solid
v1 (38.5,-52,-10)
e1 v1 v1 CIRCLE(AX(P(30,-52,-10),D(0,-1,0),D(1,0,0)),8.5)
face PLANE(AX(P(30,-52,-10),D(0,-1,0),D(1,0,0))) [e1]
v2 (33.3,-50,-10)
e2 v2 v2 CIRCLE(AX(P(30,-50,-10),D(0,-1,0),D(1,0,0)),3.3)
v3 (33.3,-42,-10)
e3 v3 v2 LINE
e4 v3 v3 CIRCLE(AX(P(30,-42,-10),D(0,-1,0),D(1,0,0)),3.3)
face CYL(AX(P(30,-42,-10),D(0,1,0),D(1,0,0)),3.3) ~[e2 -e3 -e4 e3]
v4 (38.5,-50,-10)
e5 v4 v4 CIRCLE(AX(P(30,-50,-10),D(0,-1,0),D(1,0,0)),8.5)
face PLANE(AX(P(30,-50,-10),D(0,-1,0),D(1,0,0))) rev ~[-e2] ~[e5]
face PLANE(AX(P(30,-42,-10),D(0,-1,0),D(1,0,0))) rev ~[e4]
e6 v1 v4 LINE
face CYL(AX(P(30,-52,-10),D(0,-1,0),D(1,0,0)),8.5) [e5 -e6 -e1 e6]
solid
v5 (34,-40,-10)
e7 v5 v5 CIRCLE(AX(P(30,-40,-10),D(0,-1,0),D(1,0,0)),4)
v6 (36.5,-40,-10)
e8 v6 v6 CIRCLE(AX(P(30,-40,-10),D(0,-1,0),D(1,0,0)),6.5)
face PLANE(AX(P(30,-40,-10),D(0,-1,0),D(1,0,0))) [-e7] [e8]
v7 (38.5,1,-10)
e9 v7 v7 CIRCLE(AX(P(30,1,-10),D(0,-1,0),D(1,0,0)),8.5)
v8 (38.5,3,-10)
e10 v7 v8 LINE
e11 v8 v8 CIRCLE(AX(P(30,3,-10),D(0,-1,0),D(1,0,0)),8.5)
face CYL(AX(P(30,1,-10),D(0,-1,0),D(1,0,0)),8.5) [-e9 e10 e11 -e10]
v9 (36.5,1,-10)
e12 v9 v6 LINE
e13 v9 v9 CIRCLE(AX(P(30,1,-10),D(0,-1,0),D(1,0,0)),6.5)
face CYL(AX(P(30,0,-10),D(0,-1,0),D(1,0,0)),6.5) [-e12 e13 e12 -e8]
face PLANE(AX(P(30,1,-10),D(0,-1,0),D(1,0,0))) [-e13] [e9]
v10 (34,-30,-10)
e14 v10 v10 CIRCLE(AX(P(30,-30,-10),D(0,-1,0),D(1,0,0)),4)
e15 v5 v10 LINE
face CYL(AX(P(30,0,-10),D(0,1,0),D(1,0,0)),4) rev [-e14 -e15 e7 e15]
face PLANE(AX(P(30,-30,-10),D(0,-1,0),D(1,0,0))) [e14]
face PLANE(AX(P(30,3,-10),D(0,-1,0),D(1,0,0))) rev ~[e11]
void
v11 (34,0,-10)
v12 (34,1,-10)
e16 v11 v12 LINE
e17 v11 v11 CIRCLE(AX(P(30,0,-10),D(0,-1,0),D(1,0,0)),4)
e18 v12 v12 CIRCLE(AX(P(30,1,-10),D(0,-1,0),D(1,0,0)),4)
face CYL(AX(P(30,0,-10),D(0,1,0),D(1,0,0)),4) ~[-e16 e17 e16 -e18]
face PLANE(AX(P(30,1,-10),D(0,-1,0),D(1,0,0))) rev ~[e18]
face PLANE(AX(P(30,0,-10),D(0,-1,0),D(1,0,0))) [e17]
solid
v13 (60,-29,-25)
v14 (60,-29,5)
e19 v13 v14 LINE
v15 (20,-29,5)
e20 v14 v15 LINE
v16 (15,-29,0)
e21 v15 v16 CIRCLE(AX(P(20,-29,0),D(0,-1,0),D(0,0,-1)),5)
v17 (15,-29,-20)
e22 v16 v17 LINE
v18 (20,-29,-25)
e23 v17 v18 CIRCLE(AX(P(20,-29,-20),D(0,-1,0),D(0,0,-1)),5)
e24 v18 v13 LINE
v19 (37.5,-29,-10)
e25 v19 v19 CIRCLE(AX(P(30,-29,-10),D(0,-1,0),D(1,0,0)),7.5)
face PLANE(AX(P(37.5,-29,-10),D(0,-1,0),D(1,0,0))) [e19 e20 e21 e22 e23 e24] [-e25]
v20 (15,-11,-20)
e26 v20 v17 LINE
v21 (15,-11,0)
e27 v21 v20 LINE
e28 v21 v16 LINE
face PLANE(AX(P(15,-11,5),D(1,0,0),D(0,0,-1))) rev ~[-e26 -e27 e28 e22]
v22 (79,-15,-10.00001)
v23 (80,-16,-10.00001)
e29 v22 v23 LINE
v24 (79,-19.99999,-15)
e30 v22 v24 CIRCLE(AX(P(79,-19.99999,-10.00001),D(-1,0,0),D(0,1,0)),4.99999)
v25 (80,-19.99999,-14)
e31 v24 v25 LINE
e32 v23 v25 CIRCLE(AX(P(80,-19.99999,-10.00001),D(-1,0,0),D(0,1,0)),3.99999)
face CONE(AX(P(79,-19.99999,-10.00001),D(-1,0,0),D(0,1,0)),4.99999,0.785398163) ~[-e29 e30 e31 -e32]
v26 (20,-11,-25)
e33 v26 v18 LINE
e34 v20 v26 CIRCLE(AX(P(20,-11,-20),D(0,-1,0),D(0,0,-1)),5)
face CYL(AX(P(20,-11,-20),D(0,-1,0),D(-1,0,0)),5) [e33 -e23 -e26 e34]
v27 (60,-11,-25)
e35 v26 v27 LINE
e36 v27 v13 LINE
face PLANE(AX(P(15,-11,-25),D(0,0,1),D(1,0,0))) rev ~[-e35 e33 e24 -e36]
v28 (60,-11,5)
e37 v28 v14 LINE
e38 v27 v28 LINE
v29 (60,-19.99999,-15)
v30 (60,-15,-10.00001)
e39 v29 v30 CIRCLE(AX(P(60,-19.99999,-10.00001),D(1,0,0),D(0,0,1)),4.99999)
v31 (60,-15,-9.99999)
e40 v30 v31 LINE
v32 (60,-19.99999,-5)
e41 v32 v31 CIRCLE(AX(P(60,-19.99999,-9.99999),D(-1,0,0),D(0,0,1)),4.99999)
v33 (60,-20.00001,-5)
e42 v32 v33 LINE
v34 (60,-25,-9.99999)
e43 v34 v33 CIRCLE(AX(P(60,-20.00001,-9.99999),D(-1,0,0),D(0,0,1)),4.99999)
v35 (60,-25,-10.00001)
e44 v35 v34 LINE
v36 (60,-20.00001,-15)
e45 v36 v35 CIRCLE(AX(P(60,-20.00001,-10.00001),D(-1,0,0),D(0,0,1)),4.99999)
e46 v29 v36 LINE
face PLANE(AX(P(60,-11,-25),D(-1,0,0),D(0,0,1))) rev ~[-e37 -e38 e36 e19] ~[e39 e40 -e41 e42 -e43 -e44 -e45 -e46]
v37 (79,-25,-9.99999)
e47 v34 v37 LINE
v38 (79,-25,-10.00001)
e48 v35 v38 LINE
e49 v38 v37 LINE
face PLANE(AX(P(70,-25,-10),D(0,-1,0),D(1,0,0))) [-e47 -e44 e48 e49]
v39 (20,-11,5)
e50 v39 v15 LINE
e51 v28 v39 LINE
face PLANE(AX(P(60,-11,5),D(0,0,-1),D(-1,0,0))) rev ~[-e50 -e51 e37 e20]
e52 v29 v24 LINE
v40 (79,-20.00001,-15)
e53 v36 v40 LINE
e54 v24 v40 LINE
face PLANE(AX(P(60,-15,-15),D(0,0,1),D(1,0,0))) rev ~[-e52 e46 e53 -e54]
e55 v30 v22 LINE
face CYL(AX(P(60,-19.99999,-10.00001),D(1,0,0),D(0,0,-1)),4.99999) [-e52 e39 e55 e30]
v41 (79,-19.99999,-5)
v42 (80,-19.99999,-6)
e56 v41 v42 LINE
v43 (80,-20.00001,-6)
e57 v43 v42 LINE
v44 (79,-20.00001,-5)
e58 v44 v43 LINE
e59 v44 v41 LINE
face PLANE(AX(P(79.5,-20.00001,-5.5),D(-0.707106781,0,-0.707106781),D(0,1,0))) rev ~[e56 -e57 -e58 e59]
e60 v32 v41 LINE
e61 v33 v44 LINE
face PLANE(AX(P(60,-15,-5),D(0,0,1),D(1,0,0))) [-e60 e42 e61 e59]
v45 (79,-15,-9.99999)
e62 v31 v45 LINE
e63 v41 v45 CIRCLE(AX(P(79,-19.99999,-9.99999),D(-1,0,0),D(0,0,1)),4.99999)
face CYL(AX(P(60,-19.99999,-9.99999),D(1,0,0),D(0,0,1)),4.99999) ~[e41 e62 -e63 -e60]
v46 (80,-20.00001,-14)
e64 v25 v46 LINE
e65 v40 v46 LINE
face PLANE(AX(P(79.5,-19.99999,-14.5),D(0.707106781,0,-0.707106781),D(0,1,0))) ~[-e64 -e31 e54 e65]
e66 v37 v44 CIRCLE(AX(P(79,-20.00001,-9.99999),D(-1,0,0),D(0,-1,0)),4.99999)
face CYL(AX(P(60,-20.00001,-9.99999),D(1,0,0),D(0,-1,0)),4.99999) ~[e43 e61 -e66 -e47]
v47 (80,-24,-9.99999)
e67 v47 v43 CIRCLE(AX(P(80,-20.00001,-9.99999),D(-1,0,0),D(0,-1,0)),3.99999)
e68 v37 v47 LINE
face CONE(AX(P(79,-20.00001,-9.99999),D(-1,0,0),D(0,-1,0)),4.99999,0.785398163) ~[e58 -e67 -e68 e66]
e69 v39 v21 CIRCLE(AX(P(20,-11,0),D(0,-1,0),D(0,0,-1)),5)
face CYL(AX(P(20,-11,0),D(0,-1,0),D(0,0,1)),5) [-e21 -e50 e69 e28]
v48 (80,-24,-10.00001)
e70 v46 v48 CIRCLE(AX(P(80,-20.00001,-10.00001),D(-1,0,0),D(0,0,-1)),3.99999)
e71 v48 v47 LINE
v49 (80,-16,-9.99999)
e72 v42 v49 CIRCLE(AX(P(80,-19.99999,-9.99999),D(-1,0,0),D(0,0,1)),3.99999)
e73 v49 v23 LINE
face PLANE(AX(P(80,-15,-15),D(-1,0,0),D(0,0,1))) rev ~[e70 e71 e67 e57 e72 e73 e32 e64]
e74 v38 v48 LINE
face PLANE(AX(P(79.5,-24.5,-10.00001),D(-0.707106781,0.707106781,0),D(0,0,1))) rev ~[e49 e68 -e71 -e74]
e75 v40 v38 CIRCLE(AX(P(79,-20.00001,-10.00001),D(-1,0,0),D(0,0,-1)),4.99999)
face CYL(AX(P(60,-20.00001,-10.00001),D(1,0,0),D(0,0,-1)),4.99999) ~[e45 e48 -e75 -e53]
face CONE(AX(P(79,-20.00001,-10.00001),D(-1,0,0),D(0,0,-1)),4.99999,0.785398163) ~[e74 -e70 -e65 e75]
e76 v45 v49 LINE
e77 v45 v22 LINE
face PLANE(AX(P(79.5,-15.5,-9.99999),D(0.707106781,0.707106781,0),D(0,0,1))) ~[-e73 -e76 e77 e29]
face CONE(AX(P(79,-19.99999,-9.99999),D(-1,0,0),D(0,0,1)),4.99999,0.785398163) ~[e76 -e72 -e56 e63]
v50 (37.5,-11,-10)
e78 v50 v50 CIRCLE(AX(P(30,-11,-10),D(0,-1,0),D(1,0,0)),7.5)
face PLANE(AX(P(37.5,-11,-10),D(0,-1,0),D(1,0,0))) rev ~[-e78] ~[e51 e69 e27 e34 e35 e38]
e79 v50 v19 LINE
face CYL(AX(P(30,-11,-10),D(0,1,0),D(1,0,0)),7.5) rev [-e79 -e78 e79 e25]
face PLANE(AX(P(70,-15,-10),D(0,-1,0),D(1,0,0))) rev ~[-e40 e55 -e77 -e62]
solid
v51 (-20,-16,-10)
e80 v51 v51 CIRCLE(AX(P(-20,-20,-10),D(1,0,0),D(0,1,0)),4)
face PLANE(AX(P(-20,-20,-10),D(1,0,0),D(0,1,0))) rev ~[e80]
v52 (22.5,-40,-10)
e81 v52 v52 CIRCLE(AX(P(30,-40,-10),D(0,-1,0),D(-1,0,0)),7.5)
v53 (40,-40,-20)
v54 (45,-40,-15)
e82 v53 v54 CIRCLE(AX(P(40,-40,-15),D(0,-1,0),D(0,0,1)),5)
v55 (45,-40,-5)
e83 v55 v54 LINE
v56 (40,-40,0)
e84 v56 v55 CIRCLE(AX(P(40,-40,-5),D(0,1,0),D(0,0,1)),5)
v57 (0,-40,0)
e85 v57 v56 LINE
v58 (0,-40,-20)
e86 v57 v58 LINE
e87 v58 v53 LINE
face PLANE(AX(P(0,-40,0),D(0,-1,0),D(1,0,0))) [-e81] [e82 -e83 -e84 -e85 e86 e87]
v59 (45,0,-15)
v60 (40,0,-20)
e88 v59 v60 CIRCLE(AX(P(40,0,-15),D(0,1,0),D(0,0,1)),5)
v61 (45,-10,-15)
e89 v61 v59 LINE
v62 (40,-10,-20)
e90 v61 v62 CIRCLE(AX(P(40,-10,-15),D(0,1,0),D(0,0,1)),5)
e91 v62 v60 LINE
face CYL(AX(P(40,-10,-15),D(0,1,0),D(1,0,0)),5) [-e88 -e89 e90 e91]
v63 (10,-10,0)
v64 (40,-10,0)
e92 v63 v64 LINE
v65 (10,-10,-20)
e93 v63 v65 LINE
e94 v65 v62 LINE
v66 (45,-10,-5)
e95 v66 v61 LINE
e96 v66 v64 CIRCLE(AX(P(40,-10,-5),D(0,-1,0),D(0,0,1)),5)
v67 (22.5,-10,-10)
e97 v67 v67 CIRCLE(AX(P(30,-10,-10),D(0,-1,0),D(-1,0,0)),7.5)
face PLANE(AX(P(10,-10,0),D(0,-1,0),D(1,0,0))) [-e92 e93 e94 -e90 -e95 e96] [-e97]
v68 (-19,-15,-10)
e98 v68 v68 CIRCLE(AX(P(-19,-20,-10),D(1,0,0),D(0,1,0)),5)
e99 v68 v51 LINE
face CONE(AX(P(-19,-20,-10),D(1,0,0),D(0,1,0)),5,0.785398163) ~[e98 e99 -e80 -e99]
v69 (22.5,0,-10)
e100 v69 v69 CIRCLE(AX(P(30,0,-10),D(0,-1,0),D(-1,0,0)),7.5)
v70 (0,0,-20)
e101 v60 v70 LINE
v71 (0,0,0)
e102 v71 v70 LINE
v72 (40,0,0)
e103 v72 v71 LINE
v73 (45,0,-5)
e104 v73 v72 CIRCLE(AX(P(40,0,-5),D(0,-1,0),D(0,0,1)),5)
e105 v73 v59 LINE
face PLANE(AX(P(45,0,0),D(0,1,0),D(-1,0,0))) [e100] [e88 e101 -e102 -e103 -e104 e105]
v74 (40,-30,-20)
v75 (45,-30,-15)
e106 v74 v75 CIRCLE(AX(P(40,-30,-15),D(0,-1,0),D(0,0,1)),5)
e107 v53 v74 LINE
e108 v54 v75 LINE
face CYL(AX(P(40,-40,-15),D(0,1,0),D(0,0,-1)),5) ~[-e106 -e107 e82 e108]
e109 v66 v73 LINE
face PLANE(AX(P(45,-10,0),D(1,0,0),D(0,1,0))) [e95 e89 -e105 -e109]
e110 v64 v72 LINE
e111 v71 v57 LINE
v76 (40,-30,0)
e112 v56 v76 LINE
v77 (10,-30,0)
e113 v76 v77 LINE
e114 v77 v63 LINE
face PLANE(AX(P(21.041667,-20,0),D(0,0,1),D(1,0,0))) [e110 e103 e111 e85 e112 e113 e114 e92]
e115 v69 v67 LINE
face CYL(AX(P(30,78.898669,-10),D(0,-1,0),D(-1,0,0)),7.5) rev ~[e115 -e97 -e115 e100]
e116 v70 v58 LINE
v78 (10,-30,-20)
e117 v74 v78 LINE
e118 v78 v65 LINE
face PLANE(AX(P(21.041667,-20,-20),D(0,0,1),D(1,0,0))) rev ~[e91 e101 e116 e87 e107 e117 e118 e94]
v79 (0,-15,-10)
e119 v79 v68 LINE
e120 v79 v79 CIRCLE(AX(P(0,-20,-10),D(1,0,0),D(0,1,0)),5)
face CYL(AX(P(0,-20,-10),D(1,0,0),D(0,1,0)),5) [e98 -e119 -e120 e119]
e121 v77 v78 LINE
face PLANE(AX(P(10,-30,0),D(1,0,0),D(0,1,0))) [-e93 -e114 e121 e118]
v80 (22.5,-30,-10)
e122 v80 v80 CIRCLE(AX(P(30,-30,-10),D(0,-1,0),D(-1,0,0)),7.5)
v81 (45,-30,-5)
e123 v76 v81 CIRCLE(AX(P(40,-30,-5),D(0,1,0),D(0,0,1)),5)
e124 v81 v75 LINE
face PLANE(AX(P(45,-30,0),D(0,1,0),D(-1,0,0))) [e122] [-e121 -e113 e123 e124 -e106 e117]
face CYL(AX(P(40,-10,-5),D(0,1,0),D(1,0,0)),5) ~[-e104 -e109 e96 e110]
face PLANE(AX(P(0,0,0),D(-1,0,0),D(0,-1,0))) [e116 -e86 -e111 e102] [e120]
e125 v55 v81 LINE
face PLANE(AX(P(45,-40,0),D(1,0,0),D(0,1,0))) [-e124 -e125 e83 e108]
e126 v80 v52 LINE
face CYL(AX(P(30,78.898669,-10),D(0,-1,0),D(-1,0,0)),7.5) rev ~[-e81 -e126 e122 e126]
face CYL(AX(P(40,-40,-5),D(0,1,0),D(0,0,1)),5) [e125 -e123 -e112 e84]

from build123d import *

# Parameters (mm, degrees)
F0_R          = 5
F1_DEPTH      = 20
F3_DEPTH      = 20
F4_R          = 5
F6_D          = 15
F7_SIZE       = 1
F5_R          = 6.5
F5_R_2        = 4
F8_DEPTH      = 40
F8_DEPTH_BACK = 1
F9_START      = 11
F5_R_3        = 7.5
F9_DEPTH      = 18
F10_R         = 5
F11_START     = 15
F5_W          = 20
F5_H          = 10
F11_DEPTH     = 10
F12_R         = 4.99999
F13_SIZE      = 1
F15_START     = -1
F14_R         = 8.5
F15_DEPTH     = 2
F16_START     = -8
F16_DEPTH     = 2
F5_R_4        = 3.3
F18_DEPTH     = 30
F19_START     = 42
F19_DEPTH     = 8


# Not quite as in the source:
# - a fillet or chamfer is up to 0.001 mm smaller than in the source, because OpenCascade refuses the exact size
# - a feature names something its author has since deleted; it is built from what else it names


with BuildPart() as f1:
    # F0 (on Right) → F1 (new body)
    with BuildSketch(Plane.YZ):
        with Locations((-20, -10)):
            Circle(F0_R)
    extrude(amount=-F1_DEPTH)

    # F2 (on Top) → F3 (join)
    with BuildSketch(Plane.XY):
        Polygon((45, 0), (0, 0), (0, -40), (45, -40), (45, -30), (15, -30), (10, -30), (10, -10), (15, -10), (45, -10), align=None)
    extrude(amount=-F3_DEPTH)

    # F4
    f4_edges = [f1.edges().sort_by_distance(p)[0] for p in [
        (45, -35, 0),
        (45, -5, 0),
        (45, -35, -20),
        (45, -5, -20),
    ]]
    fillet(f4_edges, radius=F4_R)

    # F6 (through all)
    with Locations(Plane(origin=(0, 0, 0), x_dir=(1, 0, 0), z_dir=(0, 1, 0))):
        with Locations((30, 10)):
            Hole(F6_D / 2)

    # F7
    f7_edges = [f1.edges().sort_by_distance(p)[0] for p in [
        (-20, -25, -10),
    ]]
    chamfer(f7_edges, length=F7_SIZE)


with BuildPart() as f8:
    # F5 (on Front) → F8 (new body, two sides)
    with BuildSketch(Plane.XZ) as f8_sk:
        with Locations((30, -10)):
            Circle(F5_R)
        with Locations((30, -10)):
            Circle(F5_R_2, mode=Mode.SUBTRACT)
    extrude(amount=F8_DEPTH)
    extrude(f8_sk.sketch, amount=-F8_DEPTH_BACK)

    # F14 (on Front) → F15 (join)
    with BuildSketch(Plane.XZ.offset(F15_START)):
        with Locations((30, -10)):
            Circle(F14_R)
    extrude(amount=-F15_DEPTH)

    # F5 (on Front) → F18 (join)
    with BuildSketch(Plane.XZ):
        with Locations((30, -10)):
            Circle(F5_R_2)
        with Locations((30, -10)):
            Circle(F5_R_4, mode=Mode.SUBTRACT)
        with Locations((30, -10)):
            Circle(F5_R_4)
    extrude(amount=F18_DEPTH)


with BuildPart() as f9:
    # F5 (on Front) → F9 (new body)
    with BuildSketch(Plane.XZ.offset(F9_START)):
        Polygon((60, 5), (15, 5), (15, -25), (60, -25), (60, -15), (60, -5), align=None)
        with Locations((30, -10)):
            Circle(F5_R_3, mode=Mode.SUBTRACT)
    extrude(amount=F9_DEPTH)

    # F10
    f10_edges = [f9.edges().sort_by_distance(p)[0] for p in [
        (15, -20, 5),
        (15, -20, -25),
    ]]
    fillet(f10_edges, radius=F10_R)

    # F5 (on Front) → F11 (join)
    with BuildSketch(Plane.XZ.offset(F11_START)):
        with Locations((70, -10)):
            Rectangle(F5_W, F5_H)
    extrude(amount=F11_DEPTH)

    # F12 (radius 5 in the source; OpenCascade refuses exactly that, so slightly less here)
    f12_edges = [f9.edges().sort_by_distance(p)[0] for p in [
        (70, -25, -5),
        (70, -15, -5),
        (70, -15, -15),
        (70, -25, -15),
    ]]
    fillet(f12_edges, radius=F12_R)

    # F13
    f13_edges = [f9.edges().sort_by_distance(p)[0] for p in [
        (80, -20, -15),
        (80, -16.464463, -13.535537),
        (80, -23.535537, -13.535537),
        (80, -15, -10),
        (80, -25, -10),
        (80, -16.464463, -6.464463),
        (80, -23.535537, -6.464463),
        (80, -20, -5),
    ]]
    chamfer(f13_edges, length=F13_SIZE)


with BuildPart() as f16:
    # F14 (on Front) → F16 (new body)
    with BuildSketch(Plane.XZ.offset(F16_START)):
        with Locations((30, -10)):
            Circle(F14_R)
    extrude(amount=-F16_DEPTH)


with BuildPart() as f16_1:
    # F17: moved
    add(f16.part.moved(Location((0, -60, 0))))

    # F5 (on Front) → F19 (join)
    with BuildSketch(Plane.XZ.offset(F19_START)):
        with Locations((30, -10)):
            Circle(F5_R_4)
    extrude(amount=F19_DEPTH)


solid = Compound([f1.part, f8.part, f9.part, f16_1.part])
